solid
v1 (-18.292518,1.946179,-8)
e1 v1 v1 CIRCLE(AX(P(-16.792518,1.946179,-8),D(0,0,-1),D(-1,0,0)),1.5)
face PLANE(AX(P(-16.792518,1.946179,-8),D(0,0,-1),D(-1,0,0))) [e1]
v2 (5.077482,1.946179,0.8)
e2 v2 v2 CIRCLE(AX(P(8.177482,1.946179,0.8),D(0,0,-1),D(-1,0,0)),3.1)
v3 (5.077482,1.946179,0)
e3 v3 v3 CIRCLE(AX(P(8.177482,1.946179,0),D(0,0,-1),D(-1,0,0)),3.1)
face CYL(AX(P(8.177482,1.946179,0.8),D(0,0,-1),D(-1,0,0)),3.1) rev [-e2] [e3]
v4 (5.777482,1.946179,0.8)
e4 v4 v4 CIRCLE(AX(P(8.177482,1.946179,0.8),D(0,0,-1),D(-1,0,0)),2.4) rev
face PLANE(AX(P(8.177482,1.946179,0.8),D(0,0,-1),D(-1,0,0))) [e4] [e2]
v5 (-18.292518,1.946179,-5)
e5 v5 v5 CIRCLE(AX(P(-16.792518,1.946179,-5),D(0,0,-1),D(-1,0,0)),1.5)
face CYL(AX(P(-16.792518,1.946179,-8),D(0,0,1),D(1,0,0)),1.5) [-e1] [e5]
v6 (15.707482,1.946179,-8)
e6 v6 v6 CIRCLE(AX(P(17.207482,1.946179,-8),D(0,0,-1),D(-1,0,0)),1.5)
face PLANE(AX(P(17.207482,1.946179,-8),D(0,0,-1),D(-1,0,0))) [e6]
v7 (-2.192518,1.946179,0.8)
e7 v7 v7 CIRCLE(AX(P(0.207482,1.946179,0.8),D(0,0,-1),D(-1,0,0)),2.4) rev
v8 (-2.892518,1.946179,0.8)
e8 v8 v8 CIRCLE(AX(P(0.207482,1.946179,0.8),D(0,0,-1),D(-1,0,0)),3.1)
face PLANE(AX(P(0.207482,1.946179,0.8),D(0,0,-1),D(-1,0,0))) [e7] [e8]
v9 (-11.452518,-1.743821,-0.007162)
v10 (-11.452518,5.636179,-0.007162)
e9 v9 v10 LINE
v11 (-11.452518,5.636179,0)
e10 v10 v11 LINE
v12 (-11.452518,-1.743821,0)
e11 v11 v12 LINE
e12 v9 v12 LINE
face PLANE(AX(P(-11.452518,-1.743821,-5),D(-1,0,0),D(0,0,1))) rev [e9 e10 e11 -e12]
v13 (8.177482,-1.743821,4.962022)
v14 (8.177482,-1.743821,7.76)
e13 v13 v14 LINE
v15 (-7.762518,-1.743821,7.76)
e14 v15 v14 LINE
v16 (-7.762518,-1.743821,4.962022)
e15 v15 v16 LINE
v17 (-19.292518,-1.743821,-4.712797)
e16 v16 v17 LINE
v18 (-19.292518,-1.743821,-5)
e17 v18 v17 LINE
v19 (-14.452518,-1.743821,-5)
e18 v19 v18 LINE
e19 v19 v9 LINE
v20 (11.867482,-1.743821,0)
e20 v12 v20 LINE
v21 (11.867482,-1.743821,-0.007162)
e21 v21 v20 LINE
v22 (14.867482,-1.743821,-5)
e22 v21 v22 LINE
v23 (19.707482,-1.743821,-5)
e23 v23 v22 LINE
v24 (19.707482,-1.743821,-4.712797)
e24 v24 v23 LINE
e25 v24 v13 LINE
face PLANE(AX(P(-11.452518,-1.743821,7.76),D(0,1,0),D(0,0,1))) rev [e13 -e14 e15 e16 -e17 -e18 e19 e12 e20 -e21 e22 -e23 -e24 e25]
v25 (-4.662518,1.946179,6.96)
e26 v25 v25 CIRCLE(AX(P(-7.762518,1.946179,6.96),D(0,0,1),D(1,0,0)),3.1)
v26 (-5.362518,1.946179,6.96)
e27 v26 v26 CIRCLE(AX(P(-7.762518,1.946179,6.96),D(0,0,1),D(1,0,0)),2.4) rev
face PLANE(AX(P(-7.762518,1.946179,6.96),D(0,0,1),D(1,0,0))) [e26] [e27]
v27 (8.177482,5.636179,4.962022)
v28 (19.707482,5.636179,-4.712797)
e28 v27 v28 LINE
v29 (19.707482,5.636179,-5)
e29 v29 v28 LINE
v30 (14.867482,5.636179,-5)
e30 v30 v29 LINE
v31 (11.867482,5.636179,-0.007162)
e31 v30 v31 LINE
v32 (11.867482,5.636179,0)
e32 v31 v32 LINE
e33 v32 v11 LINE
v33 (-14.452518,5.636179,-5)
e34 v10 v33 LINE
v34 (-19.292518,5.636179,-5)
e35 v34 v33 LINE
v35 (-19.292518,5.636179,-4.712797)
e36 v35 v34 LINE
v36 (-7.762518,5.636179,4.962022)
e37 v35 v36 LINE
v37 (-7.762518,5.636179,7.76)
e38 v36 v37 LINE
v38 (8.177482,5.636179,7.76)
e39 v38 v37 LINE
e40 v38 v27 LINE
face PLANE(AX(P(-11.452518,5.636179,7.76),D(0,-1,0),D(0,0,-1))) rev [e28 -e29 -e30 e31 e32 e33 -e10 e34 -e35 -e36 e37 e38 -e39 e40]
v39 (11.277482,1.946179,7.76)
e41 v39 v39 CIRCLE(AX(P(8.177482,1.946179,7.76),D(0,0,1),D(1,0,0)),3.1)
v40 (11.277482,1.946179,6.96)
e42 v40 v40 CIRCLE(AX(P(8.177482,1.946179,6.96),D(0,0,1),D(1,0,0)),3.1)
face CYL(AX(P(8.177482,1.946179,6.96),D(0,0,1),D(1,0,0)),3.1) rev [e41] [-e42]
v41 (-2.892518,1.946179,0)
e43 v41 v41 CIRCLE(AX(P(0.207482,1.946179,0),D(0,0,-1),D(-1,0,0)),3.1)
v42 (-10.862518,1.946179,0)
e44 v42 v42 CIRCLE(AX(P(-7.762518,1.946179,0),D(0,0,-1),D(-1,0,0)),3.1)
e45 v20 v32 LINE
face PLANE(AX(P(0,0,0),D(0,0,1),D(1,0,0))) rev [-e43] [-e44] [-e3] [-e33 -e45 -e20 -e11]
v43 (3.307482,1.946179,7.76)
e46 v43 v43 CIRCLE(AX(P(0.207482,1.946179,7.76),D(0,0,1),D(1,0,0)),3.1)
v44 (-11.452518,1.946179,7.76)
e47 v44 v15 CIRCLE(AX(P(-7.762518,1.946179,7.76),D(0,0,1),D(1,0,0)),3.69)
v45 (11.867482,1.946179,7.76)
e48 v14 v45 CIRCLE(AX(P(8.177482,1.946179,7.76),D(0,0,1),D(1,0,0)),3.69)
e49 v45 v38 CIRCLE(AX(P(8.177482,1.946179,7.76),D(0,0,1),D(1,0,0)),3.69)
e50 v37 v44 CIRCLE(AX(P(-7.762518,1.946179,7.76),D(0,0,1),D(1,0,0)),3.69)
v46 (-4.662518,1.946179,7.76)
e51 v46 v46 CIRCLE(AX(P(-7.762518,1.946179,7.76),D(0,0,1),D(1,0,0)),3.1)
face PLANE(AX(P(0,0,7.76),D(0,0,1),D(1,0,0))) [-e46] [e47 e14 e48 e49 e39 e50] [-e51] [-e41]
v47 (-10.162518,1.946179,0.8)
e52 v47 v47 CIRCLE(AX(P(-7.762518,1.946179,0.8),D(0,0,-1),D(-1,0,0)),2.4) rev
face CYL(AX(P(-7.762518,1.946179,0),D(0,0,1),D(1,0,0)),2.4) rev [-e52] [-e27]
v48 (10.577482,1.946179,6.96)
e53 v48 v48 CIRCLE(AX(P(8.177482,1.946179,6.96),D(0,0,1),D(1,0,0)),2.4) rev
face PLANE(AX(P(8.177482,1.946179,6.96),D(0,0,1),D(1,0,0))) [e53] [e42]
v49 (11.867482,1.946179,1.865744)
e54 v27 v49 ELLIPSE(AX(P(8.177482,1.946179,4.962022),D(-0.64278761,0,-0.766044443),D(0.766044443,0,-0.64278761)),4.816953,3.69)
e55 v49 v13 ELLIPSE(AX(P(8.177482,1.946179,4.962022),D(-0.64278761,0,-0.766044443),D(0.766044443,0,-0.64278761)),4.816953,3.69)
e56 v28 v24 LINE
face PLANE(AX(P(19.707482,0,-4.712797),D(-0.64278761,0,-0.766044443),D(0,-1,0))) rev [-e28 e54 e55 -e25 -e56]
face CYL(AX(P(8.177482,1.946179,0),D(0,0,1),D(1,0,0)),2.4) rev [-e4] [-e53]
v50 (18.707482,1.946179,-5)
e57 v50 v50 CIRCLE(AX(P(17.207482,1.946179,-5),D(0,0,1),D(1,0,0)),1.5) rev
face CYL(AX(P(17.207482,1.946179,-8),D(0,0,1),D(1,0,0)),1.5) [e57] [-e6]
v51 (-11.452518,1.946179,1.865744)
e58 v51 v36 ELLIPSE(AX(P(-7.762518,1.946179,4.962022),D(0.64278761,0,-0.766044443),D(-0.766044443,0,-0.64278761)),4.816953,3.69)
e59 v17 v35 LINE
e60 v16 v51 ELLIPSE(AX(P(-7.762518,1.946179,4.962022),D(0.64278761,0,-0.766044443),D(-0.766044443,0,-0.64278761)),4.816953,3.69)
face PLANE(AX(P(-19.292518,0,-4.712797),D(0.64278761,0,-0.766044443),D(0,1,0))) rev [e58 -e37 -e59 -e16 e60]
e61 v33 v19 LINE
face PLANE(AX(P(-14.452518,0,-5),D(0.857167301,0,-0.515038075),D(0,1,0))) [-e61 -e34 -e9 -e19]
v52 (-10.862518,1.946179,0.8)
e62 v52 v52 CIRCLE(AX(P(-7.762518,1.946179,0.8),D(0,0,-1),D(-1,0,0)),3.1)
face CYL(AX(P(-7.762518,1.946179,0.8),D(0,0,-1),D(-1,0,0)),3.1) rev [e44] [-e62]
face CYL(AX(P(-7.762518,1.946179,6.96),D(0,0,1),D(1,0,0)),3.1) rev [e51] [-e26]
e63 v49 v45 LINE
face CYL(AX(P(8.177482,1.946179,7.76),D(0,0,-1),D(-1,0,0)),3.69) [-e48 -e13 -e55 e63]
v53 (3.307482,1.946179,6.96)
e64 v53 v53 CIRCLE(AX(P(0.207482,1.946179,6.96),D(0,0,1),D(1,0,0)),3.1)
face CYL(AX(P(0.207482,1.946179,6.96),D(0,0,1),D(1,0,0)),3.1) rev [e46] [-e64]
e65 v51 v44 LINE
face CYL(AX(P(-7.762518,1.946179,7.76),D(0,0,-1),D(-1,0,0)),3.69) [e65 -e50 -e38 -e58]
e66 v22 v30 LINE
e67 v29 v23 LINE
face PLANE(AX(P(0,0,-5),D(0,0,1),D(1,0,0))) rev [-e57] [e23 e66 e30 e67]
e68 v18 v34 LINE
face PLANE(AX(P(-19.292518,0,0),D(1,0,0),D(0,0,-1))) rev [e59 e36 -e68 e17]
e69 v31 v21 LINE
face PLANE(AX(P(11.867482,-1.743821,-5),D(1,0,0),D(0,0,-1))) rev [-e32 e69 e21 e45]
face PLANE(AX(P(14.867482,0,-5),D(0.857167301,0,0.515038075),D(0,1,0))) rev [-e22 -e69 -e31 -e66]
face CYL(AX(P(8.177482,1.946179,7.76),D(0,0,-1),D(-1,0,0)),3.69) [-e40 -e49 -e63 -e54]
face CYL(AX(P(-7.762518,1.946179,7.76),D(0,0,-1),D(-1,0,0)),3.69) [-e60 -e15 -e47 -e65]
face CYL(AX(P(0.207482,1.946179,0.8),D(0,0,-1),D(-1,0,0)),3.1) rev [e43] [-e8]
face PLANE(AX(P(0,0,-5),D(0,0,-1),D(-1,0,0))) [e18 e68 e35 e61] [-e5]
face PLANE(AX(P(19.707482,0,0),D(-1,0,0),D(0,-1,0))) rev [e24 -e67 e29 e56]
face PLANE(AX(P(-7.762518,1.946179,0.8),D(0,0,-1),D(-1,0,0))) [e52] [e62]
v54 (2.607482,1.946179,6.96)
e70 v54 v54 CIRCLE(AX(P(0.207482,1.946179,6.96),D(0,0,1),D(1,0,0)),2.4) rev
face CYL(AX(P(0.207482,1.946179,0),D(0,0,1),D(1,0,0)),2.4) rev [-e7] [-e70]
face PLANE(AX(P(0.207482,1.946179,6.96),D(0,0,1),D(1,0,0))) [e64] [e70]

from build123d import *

# Parameters (mm, degrees)
SKETCH1_W           = 23.32
SKETCH1_H           = 7.38
BOSS_EXTRUDE1_DEPTH = 7.76
SKETCH4_R           = 2.4
CUT_EXTRUDE1_DEPTH  = 7.76
SKETCH5_R           = 3.1
CUT_EXTRUDE2_DEPTH  = 0.8
CUT_EXTRUDE3_START  = -0.8
SKETCH6_R           = 3.1
CUT_EXTRUDE3_DEPTH  = 0.8
SKETCH7_W           = 2
SKETCH7_H           = 7.38
BOSS_EXTRUDE2_DEPTH = 7.84
SKETCH8_W           = 2
SKETCH8_H           = 7.38
BOSS_EXTRUDE3_DEPTH = 7.84
SKETCH9_W           = 7.84
SKETCH9_H           = 7.38
BOSS_EXTRUDE4_DEPTH = 5
SKETCH10_R          = 1.5
BOSS_EXTRUDE5_DEPTH = 3
CHAMFER1_SIZE       = 8
CHAMFER1_SIZE_2     = 6.712797049
CHAMFER2_SIZE       = 6.712797049
CHAMFER2_SIZE_2     = 8
CHAMFER3_SIZE       = 3
CHAMFER3_SIZE2      = 4.992838447
CHAMFER4_SIZE       = 3
CHAMFER4_SIZE2      = 4.992838447
FILLET1_R           = 3.69


# Some blends are built 0.0001 mm under size
with BuildPart() as part:
    # Sketch1 → Boss-Extrude1 (new body)
    with BuildSketch(Plane.XY):
        with Locations((0.207481698, 1.946178624)):
            Rectangle(SKETCH1_W, SKETCH1_H)
    extrude(amount=BOSS_EXTRUDE1_DEPTH)

    # Sketch4 → Cut-Extrude1 (cut)
    with BuildSketch(Plane.XY.offset(7.76)):
        with Locations((0.207481698, 1.946178624)):
            Circle(SKETCH4_R)
        with Locations((8.177481698, 1.946178624)):
            Circle(SKETCH4_R)
        with Locations((-7.762518302, 1.946178624)):
            Circle(SKETCH4_R)
    extrude(amount=-CUT_EXTRUDE1_DEPTH, mode=Mode.SUBTRACT)

    # Sketch5 → Cut-Extrude2 (cut)
    with BuildSketch(Plane.XY.offset(7.76)):
        with Locations((-7.762518302, 1.946178624)):
            Circle(SKETCH5_R)
        with Locations((0.207481698, 1.946178624)):
            Circle(SKETCH5_R)
        with Locations((8.177481698, 1.946178624)):
            Circle(SKETCH5_R)
    extrude(amount=-CUT_EXTRUDE2_DEPTH, mode=Mode.SUBTRACT)

    # Sketch6 → Cut-Extrude3 (cut)
    with BuildSketch(Plane(origin=(0, 0, 0), x_dir=(-1, 0, 0), z_dir=(0, 0, -1)).offset(CUT_EXTRUDE3_START)):
        with Locations(Location((-8.177481698, 1.946178624, 0), (0, 0, 180))):
            Circle(SKETCH6_R)
        with Locations(Location((-0.207481698, 1.946178624, 0), (0, 0, 180))):
            Circle(SKETCH6_R)
        with Locations(Location((7.762518302, 1.946178624, 0), (0, 0, 180))):
            Circle(SKETCH6_R)
    extrude(amount=CUT_EXTRUDE3_DEPTH, mode=Mode.SUBTRACT)

    # Sketch7 → Boss-Extrude2 (add)
    with BuildSketch(Plane(origin=(11.867481698, 0, 0), x_dir=(0, 0, -1), z_dir=(1, 0, 0))):
        with Locations((-1, 1.946178624)):
            Rectangle(SKETCH7_W, SKETCH7_H)
    extrude(amount=BOSS_EXTRUDE2_DEPTH)

    # Sketch8 → Boss-Extrude3 (add)
    with BuildSketch(Plane.ZY.offset(11.452518302)):
        with Locations((1, 1.946178624)):
            Rectangle(SKETCH8_W, SKETCH8_H)
    extrude(amount=BOSS_EXTRUDE3_DEPTH)

    # Sketch9 → Boss-Extrude4 (add)
    with BuildSketch(Plane(origin=(0, 0, 0), x_dir=(-1, 0, 0), z_dir=(0, 0, -1))):
        with Locations((-15.787481698, 1.946178624)):
            Rectangle(SKETCH9_W, SKETCH9_H)
        with Locations((15.372518302, 1.946178624)):
            Rectangle(SKETCH9_W, SKETCH9_H)
    extrude(amount=BOSS_EXTRUDE4_DEPTH)

    # Sketch10 → Boss-Extrude5 (add)
    with BuildSketch(Plane(origin=(0, 0, -5), x_dir=(-1, 0, 0), z_dir=(0, 0, -1))):
        with Locations((16.792518302, 1.946178624)):
            Circle(SKETCH10_R)
        with Locations(Location((-17.207481698, 1.946178624, 0), (0, 0, 180))):
            Circle(SKETCH10_R)
    extrude(amount=BOSS_EXTRUDE5_DEPTH)

    # Chamfer1
    # the kernel refuses this chamfer: 8, 6.712797049 mm, written as the material it takes off along each edge
    with BuildSketch(Plane(origin=(19.707481698, 26.25542745, 2), x_dir=(-0.9996889667359941, 0, 0.024939322090234348), z_dir=(0, -1, 0))) as chamfer1_piece_1_section:
        Polygon((CHAMFER1_SIZE * 0.999688966736, CHAMFER1_SIZE * 0.0249393220902), (-CHAMFER1_SIZE_2 * 0.0249393220918, CHAMFER1_SIZE_2 * 0.999688966798), (0, 0), align=None)
    chamfer1_piece_1 = extrude(amount=48.618497654, mode=Mode.PRIVATE)
    chamfer1_piece_1 = split(chamfer1_piece_1, bisect_by=Plane(origin=(11.867481698, 1.946178624, -0.208519476), z_dir=(1, 0, 0)), keep=Keep.TOP, mode=Mode.PRIVATE)
    add(chamfer1_piece_1, mode=Mode.SUBTRACT)

    # Chamfer2
    # the kernel refuses this chamfer: 8, 6.712797049 mm, written as the material it takes off along each edge
    with BuildSketch(Plane(origin=(-19.292518302, -22.363070203, 2), x_dir=(-0.035409536913662526, 0, -0.9993728857116146), z_dir=(0, 1, 0))) as chamfer2_piece_1_section:
        Polygon((CHAMFER2_SIZE * 0.999372885774, -CHAMFER2_SIZE * 0.0354095369159), (-CHAMFER2_SIZE_2 * 0.0354095369137, -CHAMFER2_SIZE_2 * 0.999372885712), (0, 0), align=None)
    chamfer2_piece_1 = extrude(amount=48.618497654, mode=Mode.PRIVATE)
    chamfer2_piece_1 = split(chamfer2_piece_1, bisect_by=Plane(origin=(-11.452518302, 1.946178624, -0.208519476), z_dir=(-1, 0, 0)), keep=Keep.TOP, mode=Mode.PRIVATE)
    add(chamfer2_piece_1, mode=Mode.SUBTRACT)

    # Chamfer3
    chamfer3_edges = [part.edges().sort_by_distance(p)[0] for p in [
        (11.867481698, 1.946178624, -5),
    ]]
    chamfer3_side = [part.faces().sort_by_distance(p)[0] for p in [
        (15.589858806, 1.946178624, -5),
    ]]
    chamfer(chamfer3_edges, length=CHAMFER3_SIZE, length2=CHAMFER3_SIZE2, reference=chamfer3_side[0])

    # Chamfer4
    chamfer4_edges = [part.edges().sort_by_distance(p)[0] for p in [
        (-11.452518302, 1.946178624, -5),
    ]]
    chamfer4_side = [part.faces().sort_by_distance(p)[0] for p in [
        (-15.17489541, 1.946178624, -5),
    ]]
    chamfer(chamfer4_edges, length=CHAMFER4_SIZE, length2=CHAMFER4_SIZE2, reference=chamfer4_side[0])

    # Fillet1
    fillet1_edges = [part.edges().sort_by_distance(p)[0] for p in [
        (11.867481698, -1.743821376, 4.81287203),
        (11.867481698, 5.636178624, 4.81287203),
        (-11.452518302, 5.636178624, 4.81287203),
        (-11.452518302, -1.743821376, 4.81287203),
    ]]
    fillet(fillet1_edges, radius=FILLET1_R - 0.0001)  # a hair under: the kernel refuses the full size


solid = part.part
